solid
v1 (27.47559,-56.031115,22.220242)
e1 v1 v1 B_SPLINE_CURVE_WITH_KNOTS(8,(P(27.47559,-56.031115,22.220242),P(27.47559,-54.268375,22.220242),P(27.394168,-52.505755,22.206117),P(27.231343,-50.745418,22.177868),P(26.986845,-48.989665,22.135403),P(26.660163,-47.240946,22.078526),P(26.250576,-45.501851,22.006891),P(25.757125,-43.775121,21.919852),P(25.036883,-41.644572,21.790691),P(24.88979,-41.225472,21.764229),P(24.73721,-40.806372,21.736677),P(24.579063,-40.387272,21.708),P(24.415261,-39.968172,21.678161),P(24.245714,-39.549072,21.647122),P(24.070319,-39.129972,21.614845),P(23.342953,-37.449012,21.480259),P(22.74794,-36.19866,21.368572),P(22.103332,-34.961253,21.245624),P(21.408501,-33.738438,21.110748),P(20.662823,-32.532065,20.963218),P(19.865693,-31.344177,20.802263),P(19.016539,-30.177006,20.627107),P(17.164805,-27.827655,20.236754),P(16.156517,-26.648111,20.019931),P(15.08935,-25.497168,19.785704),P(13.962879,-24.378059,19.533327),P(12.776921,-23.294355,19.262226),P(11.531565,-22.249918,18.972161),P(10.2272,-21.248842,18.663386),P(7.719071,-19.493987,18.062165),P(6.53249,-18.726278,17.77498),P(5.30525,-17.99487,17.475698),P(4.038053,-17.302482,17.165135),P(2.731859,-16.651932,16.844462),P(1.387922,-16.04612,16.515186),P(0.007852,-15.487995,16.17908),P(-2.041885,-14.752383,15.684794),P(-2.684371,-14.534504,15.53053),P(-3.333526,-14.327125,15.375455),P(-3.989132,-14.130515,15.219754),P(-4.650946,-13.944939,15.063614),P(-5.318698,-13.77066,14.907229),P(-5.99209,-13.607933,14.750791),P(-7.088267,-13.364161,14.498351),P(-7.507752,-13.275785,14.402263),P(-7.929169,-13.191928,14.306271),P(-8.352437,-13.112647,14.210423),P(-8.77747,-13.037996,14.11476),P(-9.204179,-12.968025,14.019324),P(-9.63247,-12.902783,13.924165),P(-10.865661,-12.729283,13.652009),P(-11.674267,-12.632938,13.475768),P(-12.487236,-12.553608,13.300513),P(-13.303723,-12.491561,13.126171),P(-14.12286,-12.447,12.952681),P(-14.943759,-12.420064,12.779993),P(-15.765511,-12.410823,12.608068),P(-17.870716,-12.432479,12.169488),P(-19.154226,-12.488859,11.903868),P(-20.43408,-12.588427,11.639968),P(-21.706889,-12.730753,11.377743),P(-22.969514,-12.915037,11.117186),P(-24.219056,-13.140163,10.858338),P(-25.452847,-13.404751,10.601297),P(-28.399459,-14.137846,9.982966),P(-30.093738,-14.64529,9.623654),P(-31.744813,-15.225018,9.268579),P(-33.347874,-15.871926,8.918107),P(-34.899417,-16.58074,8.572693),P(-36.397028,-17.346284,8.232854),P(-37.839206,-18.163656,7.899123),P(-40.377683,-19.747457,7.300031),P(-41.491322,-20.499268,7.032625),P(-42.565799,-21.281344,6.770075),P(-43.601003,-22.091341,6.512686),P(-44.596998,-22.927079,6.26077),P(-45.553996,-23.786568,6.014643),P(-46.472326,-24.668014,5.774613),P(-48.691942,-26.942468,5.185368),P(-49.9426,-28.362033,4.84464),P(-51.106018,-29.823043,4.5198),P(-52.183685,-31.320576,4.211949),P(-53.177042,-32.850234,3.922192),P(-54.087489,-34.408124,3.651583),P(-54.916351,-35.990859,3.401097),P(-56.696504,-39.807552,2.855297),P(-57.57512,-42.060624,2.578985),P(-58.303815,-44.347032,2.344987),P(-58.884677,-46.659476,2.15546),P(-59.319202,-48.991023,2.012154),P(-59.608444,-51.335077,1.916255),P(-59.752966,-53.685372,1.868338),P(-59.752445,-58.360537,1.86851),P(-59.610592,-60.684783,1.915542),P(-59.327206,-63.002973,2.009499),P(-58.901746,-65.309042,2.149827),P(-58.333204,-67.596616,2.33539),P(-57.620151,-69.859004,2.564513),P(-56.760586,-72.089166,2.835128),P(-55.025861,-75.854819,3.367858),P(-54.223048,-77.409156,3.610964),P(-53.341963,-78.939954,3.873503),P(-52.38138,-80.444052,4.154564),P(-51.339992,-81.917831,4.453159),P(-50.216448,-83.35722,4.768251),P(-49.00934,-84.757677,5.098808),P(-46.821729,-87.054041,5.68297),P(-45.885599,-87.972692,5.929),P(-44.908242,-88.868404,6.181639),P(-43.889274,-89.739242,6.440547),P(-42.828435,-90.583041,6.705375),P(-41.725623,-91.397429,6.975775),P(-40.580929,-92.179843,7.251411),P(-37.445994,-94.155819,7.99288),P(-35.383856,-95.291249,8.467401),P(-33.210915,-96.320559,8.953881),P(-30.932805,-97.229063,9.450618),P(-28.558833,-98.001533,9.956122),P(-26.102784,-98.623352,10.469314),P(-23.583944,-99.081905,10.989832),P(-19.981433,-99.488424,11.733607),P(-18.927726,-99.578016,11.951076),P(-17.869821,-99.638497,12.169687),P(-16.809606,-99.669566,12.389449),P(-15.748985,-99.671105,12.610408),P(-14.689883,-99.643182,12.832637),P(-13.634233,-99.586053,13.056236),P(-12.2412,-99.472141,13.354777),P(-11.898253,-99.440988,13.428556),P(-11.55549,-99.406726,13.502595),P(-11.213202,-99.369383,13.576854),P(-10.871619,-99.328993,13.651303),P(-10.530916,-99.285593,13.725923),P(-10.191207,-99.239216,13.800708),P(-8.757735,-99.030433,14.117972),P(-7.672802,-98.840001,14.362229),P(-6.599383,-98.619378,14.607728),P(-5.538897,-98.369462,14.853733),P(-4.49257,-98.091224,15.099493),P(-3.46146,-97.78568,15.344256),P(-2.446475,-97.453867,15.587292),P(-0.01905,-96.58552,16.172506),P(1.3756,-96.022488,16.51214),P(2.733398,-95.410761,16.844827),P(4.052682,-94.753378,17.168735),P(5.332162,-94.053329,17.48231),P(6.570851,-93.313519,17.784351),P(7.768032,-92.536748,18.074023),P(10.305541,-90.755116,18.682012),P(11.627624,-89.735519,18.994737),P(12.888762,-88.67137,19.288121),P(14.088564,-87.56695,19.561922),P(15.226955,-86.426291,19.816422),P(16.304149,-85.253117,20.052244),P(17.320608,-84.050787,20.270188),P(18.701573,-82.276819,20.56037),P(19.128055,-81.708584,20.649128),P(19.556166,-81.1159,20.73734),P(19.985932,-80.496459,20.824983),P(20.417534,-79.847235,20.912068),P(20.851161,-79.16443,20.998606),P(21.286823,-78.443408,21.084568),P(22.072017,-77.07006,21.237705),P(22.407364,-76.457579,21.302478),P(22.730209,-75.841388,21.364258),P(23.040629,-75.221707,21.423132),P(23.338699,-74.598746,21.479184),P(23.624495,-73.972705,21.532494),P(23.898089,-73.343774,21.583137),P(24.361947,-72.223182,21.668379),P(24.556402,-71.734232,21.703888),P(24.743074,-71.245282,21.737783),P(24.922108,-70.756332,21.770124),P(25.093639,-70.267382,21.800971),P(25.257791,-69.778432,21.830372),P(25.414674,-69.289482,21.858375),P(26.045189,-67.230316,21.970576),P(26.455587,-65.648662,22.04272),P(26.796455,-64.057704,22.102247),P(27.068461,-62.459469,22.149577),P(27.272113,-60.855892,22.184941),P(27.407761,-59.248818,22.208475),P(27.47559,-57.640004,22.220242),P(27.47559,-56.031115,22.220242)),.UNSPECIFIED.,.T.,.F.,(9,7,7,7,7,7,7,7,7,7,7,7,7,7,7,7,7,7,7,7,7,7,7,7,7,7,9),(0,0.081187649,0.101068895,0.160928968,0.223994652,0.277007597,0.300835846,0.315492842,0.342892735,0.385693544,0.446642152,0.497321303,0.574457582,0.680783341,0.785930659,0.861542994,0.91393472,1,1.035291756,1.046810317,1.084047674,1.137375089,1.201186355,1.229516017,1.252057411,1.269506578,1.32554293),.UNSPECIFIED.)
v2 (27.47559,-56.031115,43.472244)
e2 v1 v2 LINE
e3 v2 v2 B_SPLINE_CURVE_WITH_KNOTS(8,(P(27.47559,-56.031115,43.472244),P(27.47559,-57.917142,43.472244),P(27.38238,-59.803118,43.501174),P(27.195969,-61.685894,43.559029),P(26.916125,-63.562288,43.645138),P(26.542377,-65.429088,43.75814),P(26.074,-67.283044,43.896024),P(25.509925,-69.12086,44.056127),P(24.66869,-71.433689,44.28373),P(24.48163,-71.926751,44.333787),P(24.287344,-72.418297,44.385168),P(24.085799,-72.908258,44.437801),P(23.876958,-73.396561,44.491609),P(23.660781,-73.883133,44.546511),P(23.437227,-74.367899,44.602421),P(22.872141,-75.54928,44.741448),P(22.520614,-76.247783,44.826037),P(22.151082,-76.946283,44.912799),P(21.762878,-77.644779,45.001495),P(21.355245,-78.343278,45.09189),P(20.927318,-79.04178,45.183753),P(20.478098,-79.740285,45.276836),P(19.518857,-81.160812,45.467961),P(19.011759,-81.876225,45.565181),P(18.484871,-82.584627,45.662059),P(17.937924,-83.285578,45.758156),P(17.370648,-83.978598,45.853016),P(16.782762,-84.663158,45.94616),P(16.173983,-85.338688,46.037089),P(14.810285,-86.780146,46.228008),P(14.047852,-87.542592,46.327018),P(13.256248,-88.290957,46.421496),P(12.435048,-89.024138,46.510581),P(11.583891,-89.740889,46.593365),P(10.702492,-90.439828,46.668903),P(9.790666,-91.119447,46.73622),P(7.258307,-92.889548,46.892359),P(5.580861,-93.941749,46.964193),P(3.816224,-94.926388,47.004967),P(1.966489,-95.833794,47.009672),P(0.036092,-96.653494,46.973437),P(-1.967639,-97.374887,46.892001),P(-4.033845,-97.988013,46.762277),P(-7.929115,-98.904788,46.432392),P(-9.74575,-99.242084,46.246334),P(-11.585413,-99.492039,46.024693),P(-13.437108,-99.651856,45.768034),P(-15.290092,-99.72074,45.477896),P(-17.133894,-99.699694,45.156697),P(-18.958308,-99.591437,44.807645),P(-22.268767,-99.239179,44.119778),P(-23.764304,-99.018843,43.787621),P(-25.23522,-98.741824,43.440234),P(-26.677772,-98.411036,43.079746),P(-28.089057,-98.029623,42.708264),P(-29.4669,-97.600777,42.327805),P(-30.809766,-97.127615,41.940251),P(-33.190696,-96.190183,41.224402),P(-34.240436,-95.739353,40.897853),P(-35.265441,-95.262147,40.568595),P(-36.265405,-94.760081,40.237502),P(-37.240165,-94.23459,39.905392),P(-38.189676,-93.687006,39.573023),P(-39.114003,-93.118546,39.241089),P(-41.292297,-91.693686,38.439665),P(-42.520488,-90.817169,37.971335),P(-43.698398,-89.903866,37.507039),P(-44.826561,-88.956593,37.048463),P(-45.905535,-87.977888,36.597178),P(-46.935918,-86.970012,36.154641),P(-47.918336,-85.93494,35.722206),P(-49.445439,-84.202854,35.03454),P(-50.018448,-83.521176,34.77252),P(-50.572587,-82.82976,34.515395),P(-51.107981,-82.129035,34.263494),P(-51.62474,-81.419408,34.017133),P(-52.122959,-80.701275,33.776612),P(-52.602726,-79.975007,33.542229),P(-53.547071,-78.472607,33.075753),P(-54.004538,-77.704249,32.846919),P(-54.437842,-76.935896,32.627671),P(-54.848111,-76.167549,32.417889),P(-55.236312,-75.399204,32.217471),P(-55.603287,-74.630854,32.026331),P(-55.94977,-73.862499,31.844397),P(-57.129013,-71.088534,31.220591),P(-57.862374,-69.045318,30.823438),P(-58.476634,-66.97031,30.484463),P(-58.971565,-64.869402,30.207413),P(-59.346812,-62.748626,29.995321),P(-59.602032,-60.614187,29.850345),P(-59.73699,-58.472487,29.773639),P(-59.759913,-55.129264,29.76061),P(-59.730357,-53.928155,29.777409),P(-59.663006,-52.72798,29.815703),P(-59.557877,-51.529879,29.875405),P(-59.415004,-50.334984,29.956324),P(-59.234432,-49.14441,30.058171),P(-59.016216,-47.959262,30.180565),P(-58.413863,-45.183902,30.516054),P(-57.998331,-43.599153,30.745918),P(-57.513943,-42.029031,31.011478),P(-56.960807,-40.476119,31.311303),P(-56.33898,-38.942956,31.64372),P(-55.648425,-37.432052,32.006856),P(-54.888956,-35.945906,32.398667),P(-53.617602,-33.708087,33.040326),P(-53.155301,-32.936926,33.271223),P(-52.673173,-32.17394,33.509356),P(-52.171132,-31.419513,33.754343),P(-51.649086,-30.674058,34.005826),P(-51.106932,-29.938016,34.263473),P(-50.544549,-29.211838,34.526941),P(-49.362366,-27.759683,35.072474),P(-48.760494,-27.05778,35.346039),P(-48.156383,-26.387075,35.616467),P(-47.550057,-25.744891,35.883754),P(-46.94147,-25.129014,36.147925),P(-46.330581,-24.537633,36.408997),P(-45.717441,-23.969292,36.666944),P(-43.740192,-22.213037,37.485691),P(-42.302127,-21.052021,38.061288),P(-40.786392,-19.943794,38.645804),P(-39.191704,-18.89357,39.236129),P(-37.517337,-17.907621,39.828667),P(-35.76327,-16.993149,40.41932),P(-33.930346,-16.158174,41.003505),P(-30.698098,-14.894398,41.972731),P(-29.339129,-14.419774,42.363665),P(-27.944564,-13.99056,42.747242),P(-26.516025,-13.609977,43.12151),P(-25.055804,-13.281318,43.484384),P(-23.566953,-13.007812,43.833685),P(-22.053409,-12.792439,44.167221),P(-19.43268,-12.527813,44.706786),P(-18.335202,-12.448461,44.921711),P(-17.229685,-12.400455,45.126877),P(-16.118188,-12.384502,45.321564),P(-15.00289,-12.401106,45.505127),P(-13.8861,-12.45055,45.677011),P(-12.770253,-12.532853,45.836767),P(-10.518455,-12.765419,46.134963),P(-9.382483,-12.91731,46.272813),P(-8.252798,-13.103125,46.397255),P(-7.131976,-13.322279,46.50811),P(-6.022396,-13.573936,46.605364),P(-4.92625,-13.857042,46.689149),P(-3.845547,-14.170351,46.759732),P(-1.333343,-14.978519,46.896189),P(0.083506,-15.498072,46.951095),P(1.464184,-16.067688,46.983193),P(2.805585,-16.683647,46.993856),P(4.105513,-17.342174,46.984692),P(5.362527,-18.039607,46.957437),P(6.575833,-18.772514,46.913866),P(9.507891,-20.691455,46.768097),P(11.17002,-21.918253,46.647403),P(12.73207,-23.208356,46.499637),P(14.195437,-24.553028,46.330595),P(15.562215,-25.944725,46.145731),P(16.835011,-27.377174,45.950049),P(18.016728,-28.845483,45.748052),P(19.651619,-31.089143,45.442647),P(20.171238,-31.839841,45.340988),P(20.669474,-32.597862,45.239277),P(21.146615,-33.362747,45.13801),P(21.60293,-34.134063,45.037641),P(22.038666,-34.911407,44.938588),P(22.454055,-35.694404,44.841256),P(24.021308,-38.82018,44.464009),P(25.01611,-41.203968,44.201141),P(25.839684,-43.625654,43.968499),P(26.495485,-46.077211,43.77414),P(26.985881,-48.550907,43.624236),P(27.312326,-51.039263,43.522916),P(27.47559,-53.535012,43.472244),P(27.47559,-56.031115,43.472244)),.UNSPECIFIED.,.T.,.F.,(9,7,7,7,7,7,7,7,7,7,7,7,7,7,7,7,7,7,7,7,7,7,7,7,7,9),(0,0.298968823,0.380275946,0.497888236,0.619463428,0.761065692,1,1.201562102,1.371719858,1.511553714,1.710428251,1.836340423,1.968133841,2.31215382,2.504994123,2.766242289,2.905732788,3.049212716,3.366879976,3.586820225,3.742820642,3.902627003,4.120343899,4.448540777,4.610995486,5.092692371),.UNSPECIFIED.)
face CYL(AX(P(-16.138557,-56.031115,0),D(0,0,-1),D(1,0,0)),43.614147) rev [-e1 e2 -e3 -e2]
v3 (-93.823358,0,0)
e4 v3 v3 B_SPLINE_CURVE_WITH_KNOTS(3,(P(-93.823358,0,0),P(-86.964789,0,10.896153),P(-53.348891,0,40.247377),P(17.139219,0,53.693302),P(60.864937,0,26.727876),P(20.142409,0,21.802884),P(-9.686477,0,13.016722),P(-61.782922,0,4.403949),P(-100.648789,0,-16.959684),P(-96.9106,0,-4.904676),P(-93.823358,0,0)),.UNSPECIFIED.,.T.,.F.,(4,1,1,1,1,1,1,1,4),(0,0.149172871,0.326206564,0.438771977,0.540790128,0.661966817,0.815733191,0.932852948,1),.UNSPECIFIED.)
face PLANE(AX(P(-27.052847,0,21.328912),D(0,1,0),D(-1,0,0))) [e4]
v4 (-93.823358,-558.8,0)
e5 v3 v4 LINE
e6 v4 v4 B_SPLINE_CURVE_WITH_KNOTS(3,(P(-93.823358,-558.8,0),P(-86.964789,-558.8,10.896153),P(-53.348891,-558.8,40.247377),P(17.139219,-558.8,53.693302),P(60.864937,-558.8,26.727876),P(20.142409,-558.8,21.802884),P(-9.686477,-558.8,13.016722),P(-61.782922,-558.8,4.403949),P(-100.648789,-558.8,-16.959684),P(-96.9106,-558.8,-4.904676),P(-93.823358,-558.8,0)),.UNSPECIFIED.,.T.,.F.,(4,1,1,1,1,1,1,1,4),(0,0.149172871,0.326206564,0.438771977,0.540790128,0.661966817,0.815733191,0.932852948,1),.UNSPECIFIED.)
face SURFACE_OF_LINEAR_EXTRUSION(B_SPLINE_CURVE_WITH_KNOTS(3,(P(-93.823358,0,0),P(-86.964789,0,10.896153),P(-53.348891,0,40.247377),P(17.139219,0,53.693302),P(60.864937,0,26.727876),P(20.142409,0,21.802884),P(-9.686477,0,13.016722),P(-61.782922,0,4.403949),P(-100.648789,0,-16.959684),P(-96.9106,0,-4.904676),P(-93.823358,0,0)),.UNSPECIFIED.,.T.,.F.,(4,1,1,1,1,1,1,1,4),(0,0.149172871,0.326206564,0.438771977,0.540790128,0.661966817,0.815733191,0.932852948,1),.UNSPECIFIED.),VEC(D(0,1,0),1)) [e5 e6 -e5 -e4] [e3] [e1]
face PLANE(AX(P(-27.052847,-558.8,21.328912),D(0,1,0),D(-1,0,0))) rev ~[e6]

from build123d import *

# Parameters (mm, degrees)
F1_DEPTH = 558.8
F2_R     = 43.6141471532
F3_DEPTH = 76.2


with BuildPart() as f1:
    # F0 (on Front) → F1 (new body)
    with BuildSketch(Plane.XZ):
        with BuildLine():
            add(Edge.make_bspline(
                [(-93.8233584166, 0), (-86.964788528, 10.8961530614), (-53.3488912454, 40.2473774939), (17.1392188212, 53.6933022681), (60.8649370164, 26.727875526), (20.1424094107, 21.802883867), (-9.6864774684, 13.0167223514), (-61.7829224074, 4.4039494215), (-100.6487891792, -16.9596835144), (-96.910600397, -4.9046757126), (-93.8233584166, 0)],
                knots=[0, 0, 0, 0, 0.1491728712, 0.3262065643, 0.4387719772, 0.5407901282, 0.6619668175, 0.8157331914, 0.9328529478, 1, 1, 1, 1], degree=3))
        make_face()
    extrude(amount=F1_DEPTH)

    # F2 (on Top) → F3 (cut)
    with BuildSketch(Plane.XY):
        with Locations((-16.1385573447, -56.0311153531)):
            Circle(F2_R)
    extrude(amount=F3_DEPTH, mode=Mode.SUBTRACT)


solid = f1.part
